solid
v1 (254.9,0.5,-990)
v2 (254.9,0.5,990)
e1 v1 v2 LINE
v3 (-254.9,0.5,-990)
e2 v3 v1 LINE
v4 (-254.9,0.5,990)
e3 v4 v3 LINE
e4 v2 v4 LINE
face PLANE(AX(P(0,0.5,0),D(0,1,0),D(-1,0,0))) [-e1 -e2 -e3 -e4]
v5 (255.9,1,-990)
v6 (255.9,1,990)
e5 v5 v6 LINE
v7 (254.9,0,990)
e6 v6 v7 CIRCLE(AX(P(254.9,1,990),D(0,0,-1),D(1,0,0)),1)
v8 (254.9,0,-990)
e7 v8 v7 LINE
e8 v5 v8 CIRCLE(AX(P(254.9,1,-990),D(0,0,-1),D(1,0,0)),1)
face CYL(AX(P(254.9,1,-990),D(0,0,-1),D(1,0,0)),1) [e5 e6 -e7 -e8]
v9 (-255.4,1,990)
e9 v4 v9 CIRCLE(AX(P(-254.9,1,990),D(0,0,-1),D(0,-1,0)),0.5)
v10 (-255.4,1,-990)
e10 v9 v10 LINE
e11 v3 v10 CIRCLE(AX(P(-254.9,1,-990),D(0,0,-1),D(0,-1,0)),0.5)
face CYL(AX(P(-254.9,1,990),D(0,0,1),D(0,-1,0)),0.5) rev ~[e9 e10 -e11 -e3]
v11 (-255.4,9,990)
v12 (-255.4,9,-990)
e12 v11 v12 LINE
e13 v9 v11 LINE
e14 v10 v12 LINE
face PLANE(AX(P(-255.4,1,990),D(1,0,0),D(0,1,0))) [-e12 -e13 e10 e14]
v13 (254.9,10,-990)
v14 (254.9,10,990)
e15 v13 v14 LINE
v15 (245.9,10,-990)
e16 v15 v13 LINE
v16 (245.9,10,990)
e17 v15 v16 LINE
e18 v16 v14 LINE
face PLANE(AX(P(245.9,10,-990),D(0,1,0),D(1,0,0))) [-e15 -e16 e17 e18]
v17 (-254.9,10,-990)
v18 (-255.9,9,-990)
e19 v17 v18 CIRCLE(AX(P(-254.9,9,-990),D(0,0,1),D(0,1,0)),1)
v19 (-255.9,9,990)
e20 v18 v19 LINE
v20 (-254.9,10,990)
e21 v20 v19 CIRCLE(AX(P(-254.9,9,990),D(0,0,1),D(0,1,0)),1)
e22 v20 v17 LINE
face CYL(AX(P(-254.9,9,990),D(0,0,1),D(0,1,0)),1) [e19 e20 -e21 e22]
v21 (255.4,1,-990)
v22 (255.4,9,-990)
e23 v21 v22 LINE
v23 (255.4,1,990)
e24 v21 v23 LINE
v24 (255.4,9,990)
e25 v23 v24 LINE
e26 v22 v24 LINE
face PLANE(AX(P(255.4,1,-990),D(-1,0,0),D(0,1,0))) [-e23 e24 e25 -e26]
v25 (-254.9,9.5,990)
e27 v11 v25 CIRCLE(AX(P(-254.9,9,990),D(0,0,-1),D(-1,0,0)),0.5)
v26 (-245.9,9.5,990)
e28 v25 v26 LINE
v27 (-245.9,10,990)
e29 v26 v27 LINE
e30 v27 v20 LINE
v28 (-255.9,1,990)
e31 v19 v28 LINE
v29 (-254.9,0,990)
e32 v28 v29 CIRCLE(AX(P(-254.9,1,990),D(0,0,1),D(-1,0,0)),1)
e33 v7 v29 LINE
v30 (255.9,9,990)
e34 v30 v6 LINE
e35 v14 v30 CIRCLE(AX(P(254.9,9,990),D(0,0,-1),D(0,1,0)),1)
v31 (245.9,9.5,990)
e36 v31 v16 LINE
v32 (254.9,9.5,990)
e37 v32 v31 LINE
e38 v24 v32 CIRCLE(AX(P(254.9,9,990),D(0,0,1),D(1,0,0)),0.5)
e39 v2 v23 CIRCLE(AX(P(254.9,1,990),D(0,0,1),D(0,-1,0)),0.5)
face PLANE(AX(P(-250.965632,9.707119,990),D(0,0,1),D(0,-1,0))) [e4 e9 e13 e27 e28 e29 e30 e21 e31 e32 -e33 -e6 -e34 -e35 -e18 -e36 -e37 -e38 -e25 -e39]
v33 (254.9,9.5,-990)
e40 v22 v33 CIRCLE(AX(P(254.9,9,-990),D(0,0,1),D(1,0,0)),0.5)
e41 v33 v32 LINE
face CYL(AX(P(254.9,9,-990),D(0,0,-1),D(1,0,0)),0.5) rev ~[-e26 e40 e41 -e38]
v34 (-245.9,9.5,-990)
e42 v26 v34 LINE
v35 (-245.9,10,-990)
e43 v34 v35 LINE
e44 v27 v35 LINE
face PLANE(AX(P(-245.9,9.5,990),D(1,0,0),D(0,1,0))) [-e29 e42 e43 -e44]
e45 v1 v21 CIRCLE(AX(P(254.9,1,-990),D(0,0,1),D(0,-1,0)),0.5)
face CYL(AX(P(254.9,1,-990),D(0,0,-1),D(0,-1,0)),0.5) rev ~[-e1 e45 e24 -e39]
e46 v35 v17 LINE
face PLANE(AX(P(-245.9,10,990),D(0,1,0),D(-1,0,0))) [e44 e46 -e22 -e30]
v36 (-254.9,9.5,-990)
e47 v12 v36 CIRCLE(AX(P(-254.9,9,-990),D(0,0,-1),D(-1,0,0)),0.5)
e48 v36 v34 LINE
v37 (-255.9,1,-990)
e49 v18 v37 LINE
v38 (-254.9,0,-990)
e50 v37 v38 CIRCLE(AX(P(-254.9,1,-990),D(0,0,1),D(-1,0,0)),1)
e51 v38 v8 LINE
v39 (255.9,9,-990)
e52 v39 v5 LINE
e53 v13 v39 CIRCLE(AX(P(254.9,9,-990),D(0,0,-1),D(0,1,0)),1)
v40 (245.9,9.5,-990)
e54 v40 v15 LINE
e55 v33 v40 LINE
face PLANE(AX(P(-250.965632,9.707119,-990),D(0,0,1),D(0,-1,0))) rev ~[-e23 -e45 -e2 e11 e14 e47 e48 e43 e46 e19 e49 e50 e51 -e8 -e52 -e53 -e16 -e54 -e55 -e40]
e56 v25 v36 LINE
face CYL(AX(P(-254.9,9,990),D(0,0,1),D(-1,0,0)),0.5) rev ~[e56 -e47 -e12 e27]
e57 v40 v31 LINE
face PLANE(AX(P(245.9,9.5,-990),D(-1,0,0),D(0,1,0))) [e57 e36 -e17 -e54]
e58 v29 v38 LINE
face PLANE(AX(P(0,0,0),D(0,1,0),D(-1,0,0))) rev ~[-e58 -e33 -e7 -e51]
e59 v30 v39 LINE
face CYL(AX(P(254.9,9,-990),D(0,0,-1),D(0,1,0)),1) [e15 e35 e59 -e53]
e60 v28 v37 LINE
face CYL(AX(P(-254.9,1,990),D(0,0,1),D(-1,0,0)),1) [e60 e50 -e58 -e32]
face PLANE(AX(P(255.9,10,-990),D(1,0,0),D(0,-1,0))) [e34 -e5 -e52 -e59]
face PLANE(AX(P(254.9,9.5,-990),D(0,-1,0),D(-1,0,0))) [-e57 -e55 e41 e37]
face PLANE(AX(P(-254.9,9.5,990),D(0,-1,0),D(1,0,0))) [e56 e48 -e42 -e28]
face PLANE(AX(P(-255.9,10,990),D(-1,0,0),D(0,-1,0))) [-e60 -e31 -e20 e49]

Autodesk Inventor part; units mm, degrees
ref_plane "YZ Plane" through (0, 0, 0) normal (1, 0, 0) x (0, 1, 0)
ref_plane "XZ Plane" through (0, 0, 0) normal (0, 1, 0) x (-1, 0, 0)
ref_plane "XY Plane" through (0, 0, 0) normal (0, 0, 1) x (1, 0, 0)
sketch "Sketch6" plane through (0, 0, 0) normal (0, 1, 0) x (-1, 0, 0)
  line L0 (255.9, -990) -> (-255.9, -990)
  line L1 (-255.9, -990) -> (-255.9, 990)
  line L2 (-255.9, 990) -> (255.9, 990)
  line L3 (255.9, 990) -> (255.9, -990)
  line L4 (255.9, -990) -> (-255.9, 990) construction
  line L5 (-255.9, -990) -> (255.9, 990) construction
  point P0 (0, 0)
  dimension "d52" = 511.8
  dimension "d53" = 1980
extrude "Plate2" add sketch "Sketch6" along normal blind 0.5
sketch "Sketch12" plane through (255.4, 0, -990) normal (1, 0, 0) x (0, 1, 0)
  line L0 (0, 1980) -> (0, 0)
  line L1 (0, 0) -> (10, 0)
  line L2 (10, 0) -> (10, 1980)
  line L3 (10, 1980) -> (0, 1980)
edge flange "Flange3" height 10 angle 90 thickness 0.5 bend radius 0.5 thickness toward (1, 0, 0) relief tear relief width 0.5 relief depth 0.25 edges at (255.9, 0.5, 0) wall of the first edge with corners at (255.4, 0, 990) (255.4, 0, -990) (255.4, 10, -990) (255.4, 10, 990)
bend "Bend4"
corner "Corner4"
sketch "Sketch13" plane through (255.9, 9.5, -990) normal (0, 1, 0) x (-1, 0, 0)
  line L0 (0, 1980) -> (0, 0)
  line L1 (0, 0) -> (10, 0)
  line L2 (10, 0) -> (10, 1980)
  line L3 (10, 1980) -> (0, 1980)
edge flange "Flange4" height 10 angle 90 thickness 0.5 bend radius 0.5 thickness toward (0, 1, 0) relief tear relief width 0.5 relief depth 0.25 edges at (255.4, 10, 0) wall of the first edge with corners at (255.9, 9.5, 990) (255.9, 9.5, -990) (245.9, 9.5, -990) (245.9, 9.5, 990)
bend "Bend5"
corner "Corner5"
sketch "Sketch14" plane through (-255.4, 0, 990) normal (-1, 0, 0) x (0, -1, 0)
  line L0 (0, -1980) -> (0, 0)
  line L1 (0, 0) -> (-10, 0)
  line L2 (-10, 0) -> (-10, -1980)
  line L3 (-10, -1980) -> (0, -1980)
edge flange "Flange5" height 10 angle 90 thickness 0.5 bend radius 0.5 thickness toward (-1, 0, 0) relief tear relief width 0.5 relief depth 0.25 edges at (-255.9, 0.5, 0) wall of the first edge with corners at (-255.4, 0, -990) (-255.4, 0, 990) (-255.4, 10, 990) (-255.4, 10, -990)
bend "Bend6"
corner "Corner6"
sketch "Sketch15" plane through (-255.9, 9.5, 990) normal (0, 1, 0) x (-1, 0, 0)
  line L0 (0, -1980) -> (0, 0)
  line L1 (0, 0) -> (-10, 0)
  line L2 (-10, 0) -> (-10, -1980)
  line L3 (-10, -1980) -> (0, -1980)
edge flange "Flange6" height 10 angle 90 thickness 0.5 bend radius 0.5 thickness toward (0, 1, 0) relief tear relief width 0.5 relief depth 0.25 edges at (-255.4, 10, 0) wall of the first edge with corners at (-255.9, 9.5, -990) (-255.9, 9.5, 990) (-245.9, 9.5, 990) (-245.9, 9.5, -990)
bend "Bend7"
corner "Corner7"
equation "\"d52\" = ЖАБРЫ_базовая_ширина - 4 * ЖАБРЫ_шаг_листов"
equation "\"d53\" = ЖАБРЫ_базовая_длина_дл_лист"
equation "\"d54\" = Thickness"
equation "\"d94\" = BendReliefWidth"
equation "\"d95\" = BendReliefDepth"
equation "\"d96\" = MinimumRemnant"
equation "\"d97\" = TransitionRadius"
equation "\"d100\" = BendRadius"
equation "\"d101\" = CornerReliefSize"
equation "\"d102\" = GapSize"
equation "\"d103\" = JacobiRadiusSize"
equation "\"d104\" = BendReliefWidth"
equation "\"d105\" = BendReliefDepth"
equation "\"d106\" = MinimumRemnant"
equation "\"d107\" = TransitionRadius"
equation "\"d110\" = BendRadius"
equation "\"d111\" = CornerReliefSize"
equation "\"d112\" = GapSize"
equation "\"d113\" = JacobiRadiusSize"
equation "\"d114\" = BendReliefWidth"
equation "\"d115\" = BendReliefDepth"
equation "\"d116\" = MinimumRemnant"
equation "\"d117\" = TransitionRadius"
equation "\"d120\" = BendRadius"
equation "\"d121\" = CornerReliefSize"
equation "\"d122\" = GapSize"
equation "\"d123\" = JacobiRadiusSize"
equation "\"d124\" = BendReliefWidth"
equation "\"d125\" = BendReliefDepth"
equation "\"d126\" = MinimumRemnant"
equation "\"d127\" = TransitionRadius"
equation "\"d130\" = BendRadius"
equation "\"d131\" = CornerReliefSize"
equation "\"d132\" = GapSize"
equation "\"d133\" = JacobiRadiusSize"
equation "\"BendRadius\" = Thickness"
equation "\"BendReliefWidth\" = Thickness"
equation "\"BendReliefDepth\" = 0.5 * Thickness"
equation "\"CornerReliefSize\" = 4 * Thickness"
equation "\"MinimumRemnant\" = 2 * Thickness"
equation "\"TransitionRadius\" = BendRadius"
equation "\"JacobiRadiusSize\" = BendRadius"
equation "\"GapSize\" = Thickness"
equation "\"ЖАБРЫ_базовая_ширина\" = 915"
equation "\"ЖАБРЫ_шаг_листов\" = 100.8"
equation "\"ЖАБРЫ_базовая_длина_дл_лист\" = 1980"
equation "\"Thickness\" = 0.5"
properties part number "MSC 810 sheet gills" material "Stainless Steel"
